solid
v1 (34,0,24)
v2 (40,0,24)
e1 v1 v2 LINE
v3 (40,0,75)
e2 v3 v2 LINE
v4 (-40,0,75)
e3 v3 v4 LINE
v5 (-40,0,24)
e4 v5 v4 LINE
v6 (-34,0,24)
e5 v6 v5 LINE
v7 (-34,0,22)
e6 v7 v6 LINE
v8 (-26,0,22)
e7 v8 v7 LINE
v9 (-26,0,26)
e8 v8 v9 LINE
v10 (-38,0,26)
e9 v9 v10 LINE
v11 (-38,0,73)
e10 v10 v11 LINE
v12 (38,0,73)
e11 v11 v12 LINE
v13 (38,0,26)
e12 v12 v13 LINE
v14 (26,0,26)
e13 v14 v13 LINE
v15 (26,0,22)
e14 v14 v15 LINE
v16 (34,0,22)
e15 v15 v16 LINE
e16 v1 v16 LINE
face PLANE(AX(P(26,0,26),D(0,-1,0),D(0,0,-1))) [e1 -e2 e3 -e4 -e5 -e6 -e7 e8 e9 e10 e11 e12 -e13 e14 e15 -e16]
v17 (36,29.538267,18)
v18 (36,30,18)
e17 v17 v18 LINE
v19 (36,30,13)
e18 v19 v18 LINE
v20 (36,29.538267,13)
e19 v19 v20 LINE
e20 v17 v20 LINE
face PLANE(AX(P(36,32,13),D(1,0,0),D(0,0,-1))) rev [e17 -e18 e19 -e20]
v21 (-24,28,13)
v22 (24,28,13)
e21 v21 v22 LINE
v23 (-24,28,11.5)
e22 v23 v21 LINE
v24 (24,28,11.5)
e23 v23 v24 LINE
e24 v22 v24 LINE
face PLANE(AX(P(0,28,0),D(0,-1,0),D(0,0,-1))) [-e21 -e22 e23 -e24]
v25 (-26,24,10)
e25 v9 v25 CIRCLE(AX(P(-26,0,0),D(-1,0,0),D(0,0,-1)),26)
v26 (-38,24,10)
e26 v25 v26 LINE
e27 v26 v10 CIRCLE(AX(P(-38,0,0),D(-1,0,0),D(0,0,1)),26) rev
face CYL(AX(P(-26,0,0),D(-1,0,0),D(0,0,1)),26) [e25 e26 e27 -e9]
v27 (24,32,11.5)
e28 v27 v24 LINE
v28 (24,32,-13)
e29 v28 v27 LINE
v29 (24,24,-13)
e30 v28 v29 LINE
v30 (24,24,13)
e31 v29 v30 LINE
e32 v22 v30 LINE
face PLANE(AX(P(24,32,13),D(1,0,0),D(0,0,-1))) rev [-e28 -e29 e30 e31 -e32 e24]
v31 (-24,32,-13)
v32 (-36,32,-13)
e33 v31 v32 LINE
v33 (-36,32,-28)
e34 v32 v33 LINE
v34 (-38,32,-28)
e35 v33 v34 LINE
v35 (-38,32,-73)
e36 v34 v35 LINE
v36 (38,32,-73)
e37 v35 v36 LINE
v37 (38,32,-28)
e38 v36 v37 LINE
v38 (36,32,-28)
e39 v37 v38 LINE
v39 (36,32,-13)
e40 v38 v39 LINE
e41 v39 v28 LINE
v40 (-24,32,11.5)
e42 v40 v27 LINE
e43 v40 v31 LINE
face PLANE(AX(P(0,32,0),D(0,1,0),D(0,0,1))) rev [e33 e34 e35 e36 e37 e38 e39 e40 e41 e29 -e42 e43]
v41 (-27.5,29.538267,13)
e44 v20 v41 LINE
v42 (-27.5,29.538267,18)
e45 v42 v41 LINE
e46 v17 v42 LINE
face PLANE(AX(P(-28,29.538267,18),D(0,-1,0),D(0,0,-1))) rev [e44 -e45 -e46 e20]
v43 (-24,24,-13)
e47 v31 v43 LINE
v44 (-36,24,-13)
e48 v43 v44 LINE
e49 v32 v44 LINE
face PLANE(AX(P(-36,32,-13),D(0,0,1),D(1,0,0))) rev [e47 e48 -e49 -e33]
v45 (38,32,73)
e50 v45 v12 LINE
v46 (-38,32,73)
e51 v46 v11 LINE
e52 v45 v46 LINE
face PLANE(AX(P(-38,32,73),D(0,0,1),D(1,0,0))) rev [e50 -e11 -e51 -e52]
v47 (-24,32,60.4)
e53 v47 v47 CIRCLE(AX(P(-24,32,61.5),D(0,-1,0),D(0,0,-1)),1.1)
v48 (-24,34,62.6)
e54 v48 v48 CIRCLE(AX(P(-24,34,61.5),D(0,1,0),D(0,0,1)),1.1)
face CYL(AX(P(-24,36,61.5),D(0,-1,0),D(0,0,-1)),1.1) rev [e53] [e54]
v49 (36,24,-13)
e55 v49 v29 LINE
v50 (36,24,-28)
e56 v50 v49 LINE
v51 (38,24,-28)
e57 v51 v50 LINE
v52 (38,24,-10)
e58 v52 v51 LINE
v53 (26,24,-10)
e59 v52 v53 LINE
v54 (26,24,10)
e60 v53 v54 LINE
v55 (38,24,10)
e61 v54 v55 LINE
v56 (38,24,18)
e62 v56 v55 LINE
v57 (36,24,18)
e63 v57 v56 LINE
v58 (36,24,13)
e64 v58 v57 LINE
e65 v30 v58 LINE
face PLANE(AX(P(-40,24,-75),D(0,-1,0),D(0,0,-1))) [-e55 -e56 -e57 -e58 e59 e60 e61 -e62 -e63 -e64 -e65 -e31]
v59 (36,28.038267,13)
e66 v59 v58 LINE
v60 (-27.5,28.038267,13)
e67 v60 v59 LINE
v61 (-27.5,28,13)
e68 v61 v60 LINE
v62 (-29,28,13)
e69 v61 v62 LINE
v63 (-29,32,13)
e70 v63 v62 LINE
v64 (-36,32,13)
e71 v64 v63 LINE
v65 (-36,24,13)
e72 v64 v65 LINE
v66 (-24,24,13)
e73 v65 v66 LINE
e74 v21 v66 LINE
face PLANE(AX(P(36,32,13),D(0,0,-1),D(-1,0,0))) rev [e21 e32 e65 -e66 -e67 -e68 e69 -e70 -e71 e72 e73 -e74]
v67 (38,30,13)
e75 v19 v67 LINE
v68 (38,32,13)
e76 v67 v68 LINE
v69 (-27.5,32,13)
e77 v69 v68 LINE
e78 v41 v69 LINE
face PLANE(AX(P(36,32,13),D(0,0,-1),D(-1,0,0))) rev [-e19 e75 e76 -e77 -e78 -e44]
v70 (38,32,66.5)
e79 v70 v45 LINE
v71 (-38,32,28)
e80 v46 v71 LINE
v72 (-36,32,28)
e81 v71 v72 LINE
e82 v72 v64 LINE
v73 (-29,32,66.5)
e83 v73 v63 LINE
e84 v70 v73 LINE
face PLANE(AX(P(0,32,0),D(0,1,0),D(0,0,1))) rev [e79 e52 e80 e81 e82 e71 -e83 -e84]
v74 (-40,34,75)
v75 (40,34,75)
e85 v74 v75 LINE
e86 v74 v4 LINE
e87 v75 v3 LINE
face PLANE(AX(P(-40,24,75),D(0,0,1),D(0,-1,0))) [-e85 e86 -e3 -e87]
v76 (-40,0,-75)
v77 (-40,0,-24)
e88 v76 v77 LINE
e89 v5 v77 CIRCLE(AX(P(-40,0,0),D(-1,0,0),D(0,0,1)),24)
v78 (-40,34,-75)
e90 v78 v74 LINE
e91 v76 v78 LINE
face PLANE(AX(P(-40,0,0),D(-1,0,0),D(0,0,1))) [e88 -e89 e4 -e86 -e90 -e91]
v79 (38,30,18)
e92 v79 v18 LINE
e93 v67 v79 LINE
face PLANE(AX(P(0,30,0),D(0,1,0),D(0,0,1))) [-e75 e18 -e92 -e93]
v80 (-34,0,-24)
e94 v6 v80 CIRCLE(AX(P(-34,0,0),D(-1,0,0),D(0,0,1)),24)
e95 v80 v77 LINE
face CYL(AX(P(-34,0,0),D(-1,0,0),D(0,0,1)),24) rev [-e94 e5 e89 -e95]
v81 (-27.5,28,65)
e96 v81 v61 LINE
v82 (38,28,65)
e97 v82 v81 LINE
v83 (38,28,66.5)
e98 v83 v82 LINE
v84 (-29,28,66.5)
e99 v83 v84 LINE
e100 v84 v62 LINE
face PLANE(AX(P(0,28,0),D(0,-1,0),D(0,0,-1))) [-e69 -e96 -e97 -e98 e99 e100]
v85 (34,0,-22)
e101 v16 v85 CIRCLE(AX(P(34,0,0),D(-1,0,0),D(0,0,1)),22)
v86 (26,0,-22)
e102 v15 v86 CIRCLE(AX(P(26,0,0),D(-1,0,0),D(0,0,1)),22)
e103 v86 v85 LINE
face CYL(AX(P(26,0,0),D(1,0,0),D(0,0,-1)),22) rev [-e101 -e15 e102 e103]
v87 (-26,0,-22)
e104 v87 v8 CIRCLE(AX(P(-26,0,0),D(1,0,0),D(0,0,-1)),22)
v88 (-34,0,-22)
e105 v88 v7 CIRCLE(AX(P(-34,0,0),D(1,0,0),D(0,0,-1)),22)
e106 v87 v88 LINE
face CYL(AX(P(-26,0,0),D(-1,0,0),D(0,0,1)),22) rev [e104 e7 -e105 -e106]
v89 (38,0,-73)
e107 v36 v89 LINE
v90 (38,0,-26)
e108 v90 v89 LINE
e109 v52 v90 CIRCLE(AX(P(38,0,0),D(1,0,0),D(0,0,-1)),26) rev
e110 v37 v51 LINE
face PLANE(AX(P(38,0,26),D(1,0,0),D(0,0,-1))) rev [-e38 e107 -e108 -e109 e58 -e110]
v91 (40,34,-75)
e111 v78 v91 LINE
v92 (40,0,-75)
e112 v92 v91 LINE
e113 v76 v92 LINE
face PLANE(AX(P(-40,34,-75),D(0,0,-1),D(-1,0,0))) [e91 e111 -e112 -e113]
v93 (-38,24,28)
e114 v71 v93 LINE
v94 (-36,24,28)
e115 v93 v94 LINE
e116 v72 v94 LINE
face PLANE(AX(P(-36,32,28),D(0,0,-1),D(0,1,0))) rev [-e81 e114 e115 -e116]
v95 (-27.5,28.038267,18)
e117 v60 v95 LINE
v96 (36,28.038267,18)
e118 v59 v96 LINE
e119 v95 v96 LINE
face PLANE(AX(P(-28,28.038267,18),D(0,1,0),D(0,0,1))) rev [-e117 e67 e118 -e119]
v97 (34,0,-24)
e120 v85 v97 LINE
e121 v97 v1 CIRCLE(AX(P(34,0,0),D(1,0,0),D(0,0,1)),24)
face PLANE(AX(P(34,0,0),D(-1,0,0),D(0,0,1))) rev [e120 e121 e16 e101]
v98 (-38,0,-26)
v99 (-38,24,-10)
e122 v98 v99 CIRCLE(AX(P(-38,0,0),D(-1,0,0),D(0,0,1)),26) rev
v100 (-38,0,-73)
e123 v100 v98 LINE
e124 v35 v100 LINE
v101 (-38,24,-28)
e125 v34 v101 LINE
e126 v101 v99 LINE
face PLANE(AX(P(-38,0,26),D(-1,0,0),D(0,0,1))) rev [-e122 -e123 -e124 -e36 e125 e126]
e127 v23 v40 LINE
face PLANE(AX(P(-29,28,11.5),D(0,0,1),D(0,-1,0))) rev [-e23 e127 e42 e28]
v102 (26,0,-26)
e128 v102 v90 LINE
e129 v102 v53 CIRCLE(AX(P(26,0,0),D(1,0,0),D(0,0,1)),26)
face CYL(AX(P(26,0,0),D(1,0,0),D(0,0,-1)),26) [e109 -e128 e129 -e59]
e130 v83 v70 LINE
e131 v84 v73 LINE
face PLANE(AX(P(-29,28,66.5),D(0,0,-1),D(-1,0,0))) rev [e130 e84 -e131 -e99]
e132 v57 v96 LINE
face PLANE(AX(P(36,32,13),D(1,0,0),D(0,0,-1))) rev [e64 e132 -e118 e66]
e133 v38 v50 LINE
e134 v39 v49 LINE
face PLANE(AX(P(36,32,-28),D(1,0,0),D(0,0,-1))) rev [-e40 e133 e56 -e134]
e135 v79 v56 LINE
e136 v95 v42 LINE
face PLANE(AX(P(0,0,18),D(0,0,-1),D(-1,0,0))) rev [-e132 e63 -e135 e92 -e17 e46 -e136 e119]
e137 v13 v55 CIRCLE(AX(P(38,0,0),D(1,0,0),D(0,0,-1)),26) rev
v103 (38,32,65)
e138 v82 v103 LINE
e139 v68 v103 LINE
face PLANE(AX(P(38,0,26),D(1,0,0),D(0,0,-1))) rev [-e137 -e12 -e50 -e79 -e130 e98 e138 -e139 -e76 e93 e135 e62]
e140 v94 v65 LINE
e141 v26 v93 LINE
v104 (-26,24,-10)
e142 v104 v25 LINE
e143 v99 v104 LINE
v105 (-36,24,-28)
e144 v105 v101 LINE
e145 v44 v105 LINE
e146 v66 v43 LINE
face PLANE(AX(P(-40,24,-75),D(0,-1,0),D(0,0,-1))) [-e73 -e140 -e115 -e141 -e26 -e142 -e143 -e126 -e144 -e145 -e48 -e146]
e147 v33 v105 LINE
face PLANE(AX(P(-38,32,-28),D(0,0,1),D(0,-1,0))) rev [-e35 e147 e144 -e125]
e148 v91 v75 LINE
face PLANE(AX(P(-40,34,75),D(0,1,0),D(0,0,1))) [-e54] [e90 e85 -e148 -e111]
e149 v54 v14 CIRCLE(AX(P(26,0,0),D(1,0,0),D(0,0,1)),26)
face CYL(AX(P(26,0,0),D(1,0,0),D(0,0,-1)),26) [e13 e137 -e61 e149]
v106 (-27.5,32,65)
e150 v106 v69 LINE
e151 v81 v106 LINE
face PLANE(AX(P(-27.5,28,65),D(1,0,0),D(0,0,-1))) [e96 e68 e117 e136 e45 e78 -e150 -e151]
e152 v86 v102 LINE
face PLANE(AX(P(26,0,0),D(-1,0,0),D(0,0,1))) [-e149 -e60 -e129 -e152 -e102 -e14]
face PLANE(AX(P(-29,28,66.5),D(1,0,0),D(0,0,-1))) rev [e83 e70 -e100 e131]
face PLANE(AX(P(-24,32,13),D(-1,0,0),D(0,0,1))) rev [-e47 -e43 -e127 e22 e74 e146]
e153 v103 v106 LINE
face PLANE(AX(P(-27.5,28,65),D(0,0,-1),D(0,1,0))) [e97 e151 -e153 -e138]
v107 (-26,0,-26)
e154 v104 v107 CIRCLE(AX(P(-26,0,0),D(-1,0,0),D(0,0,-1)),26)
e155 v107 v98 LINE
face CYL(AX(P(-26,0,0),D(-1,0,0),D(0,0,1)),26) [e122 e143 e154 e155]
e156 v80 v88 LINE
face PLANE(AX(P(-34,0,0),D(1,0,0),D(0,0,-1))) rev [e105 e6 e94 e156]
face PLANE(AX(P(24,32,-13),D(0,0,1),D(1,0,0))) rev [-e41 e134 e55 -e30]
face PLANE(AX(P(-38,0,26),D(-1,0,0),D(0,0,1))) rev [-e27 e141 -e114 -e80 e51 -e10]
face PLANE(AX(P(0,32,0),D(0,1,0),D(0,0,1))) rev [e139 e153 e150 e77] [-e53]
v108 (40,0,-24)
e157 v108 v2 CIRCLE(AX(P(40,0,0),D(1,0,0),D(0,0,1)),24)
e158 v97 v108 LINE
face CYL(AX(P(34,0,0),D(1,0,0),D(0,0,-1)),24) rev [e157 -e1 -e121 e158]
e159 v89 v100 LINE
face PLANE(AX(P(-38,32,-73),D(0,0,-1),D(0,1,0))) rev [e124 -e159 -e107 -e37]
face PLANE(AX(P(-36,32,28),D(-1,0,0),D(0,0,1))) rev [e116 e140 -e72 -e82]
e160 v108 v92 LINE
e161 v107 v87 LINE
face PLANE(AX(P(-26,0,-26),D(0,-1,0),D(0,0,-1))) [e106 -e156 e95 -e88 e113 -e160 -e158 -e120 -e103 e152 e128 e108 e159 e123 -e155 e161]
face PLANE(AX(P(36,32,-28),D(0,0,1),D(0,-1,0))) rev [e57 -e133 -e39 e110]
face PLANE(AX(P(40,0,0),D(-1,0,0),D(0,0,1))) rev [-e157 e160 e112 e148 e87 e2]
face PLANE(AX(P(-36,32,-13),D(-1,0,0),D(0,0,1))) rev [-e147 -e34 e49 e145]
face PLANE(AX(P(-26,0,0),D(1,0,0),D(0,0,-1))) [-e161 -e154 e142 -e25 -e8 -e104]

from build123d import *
from build123d.topology import SkipClean

# Parameters (mm, degrees)
EXTRUDE_2_DEPTH      = 40
EXTRUDE_2_DEPTH_BACK = 40
SKETCH_1_W           = 150
SKETCH_1_H           = 10
EXTRUDE_3_DEPTH      = 14
EXTRUDE_4_DEPTH      = 14
SKETCH_4_W           = 2
SKETCH_4_H           = 52
EXTRUDE_5_DEPTH      = 24
SKETCH_5_R           = 22
CUT_EXTRUDE_1_DEPTH  = 81
CUT_EXTRUDE_6_DEPTH  = 8
SKETCH_7_W           = 69
SKETCH_7_H           = 55
SKETCH_7_W_2         = 65.5
SKETCH_7_H_2         = 52
EXTRUDE_6_DEPTH      = 4
SKETCH_12_W          = 66
SKETCH_12_H          = 1.5
EXTRUDE_8_DEPTH      = 5
CUT_EXTRUDE_7_DEPTH  = 6
CUT_EXTRUDE_START    = -6
CUT_EXTRUDE_8_DEPTH  = 6
SKETCH_15_R          = 1.1
CUT_EXTRUDE_9_DEPTH  = 4
SKETCH_16_W          = 15.246183725
SKETCH_16_H          = 18.547486822
CUT_EXTRUDE_10_DEPTH = 2
SKETCH_17_W          = 13.790442518
SKETCH_17_H          = 12.65745234
CUT_EXTRUDE_11_DEPTH = 8
EXTRUDE_9_DEPTH      = 24


with BuildPart() as part:
    # Эскиз1 → Бобышка-Вытянуть2 (new, two sides: drawn at the far end of the back side and taken through both)
    with BuildSketch(Plane(origin=(0, 0, 0), x_dir=(0, 0, -1), z_dir=(1, 0, 0)).offset(-EXTRUDE_2_DEPTH_BACK)):
        with Locations((0, 29)):
            Rectangle(SKETCH_1_W, SKETCH_1_H)
    extrude(amount=EXTRUDE_2_DEPTH + EXTRUDE_2_DEPTH_BACK)

    # Эскиз3 → Бобышка-Вытянуть4 (add)
    with BuildSketch(Plane.ZY.offset(40)):
        with BuildLine():
            Line((-26, 0), (-22, 0))
            ThreePointArc((-22, 0), (0, 22), (22, 0))
            Line((22, 0), (26, 0))
            ThreePointArc((26, 0), (0, 26), (-26, 0))
        make_face()
    extrude(amount=-EXTRUDE_4_DEPTH)



with BuildPart() as body_2:
    # Эскиз2 → Бобышка-Вытянуть3 (new body)
    with BuildSketch(Plane(origin=(40, 0, 0), x_dir=(0, 0, -1), z_dir=(1, 0, 0))):
        with BuildLine():
            Line((-26, 0), (-22, 0))
            ThreePointArc((-22, 0), (0, 22), (22, 0))
            Line((22, 0), (26, 0))
            ThreePointArc((26, 0), (0, 26), (-26, 0))
        make_face()
    extrude(amount=-EXTRUDE_3_DEPTH)


with BuildPart() as part_1:
    add(part.part)

    add(body_2.part)  # Бобышка-Вытянуть5 merges body 2
    # Эскиз4 → Бобышка-Вытянуть5 (add)
    with BuildSketch(Plane(origin=(0, 24, 0), x_dir=(-1, 0, 0), z_dir=(0, -1, 0))):
        with Locations((39, 0)):
            Rectangle(SKETCH_4_W, SKETCH_4_H)
        with Locations((-39, 0)):
            Rectangle(SKETCH_4_W, SKETCH_4_H)
    extrude(amount=EXTRUDE_5_DEPTH)

    # Эскиз5 → Вырез-Вытянуть1 (cut)
    with SkipClean():  # the faces are left unmerged after this step: merging them gives an invalid solid
        with BuildSketch(Plane(origin=(40, 0, 0), x_dir=(0, 0, -1), z_dir=(1, 0, 0))):
            Circle(SKETCH_5_R)
        extrude(amount=-CUT_EXTRUDE_1_DEPTH, mode=Mode.SUBTRACT)
    add(part_1.part.scale(1), mode=Mode.REPLACE)  # the faces are merged on a copy

    # Эскиз6 → Вырез-Вытянуть6 (cut)
    with BuildSketch(Plane(origin=(0, 24, 0), x_dir=(-1, 0, 0), z_dir=(0, -1, 0))):
        Polygon((38, 28), (36, 28), (36, 13), (24, 13), (24, -13), (36, -13), (36, -28), (38, -28), (38, -73), (-38, -73), (-38, -27.999124699), (-36, -27.999124699), (-36, -13), (-24, -13), (-24, 13), (-36, 13), (-36, 28), (-38, 28), (-38, 73), (38, 73), align=None)
    extrude(amount=-CUT_EXTRUDE_6_DEPTH, mode=Mode.SUBTRACT)

    # Эскиз7 → Бобышка-Вытянуть6 (add)
    with BuildSketch(Plane.XZ.offset(-32)):
        with Locations((5.5, 39)):
            Rectangle(SKETCH_7_W, SKETCH_7_H)
        with Locations((5.25, 39)):
            Rectangle(SKETCH_7_W_2, SKETCH_7_H_2, mode=Mode.SUBTRACT)
    extrude(amount=EXTRUDE_6_DEPTH)

    # Эскиз12 → Бобышка-Вытянуть8 (add)
    with BuildSketch(Plane.XY.offset(13)):
        with Locations((5, 28.788266855)):
            Rectangle(SKETCH_12_W, SKETCH_12_H)
    extrude(amount=EXTRUDE_8_DEPTH)

    # Эскиз13 → Вырез-Вытянуть7 (cut)
    with BuildSketch(Plane(origin=(40, 0, 0), x_dir=(0, 0, -1), z_dir=(1, 0, 0))):
        with BuildLine():
            Line((-24, 0), (-22, 0))
            ThreePointArc((-22, 0), (0, 22), (22, 0))
            Line((22, 0), (24, 0))
            ThreePointArc((24, 0), (0, 24), (-24, 0))
        make_face()
    extrude(amount=-CUT_EXTRUDE_7_DEPTH, mode=Mode.SUBTRACT)

    # Эскиз14 → Вырез-Вытянуть8 (cut)
    with BuildSketch(Plane.ZY.offset(40).offset(CUT_EXTRUDE_START)):
        with BuildLine():
            Line((-24, 0), (-22, 0))
            ThreePointArc((-22, 0), (0, 22), (22, 0))
            Line((22, 0), (24, 0))
            ThreePointArc((24, 0), (0, 24), (-24, 0))
        make_face()
    extrude(amount=CUT_EXTRUDE_8_DEPTH, mode=Mode.SUBTRACT)

    # Эскиз15 → Вырез-Вытянуть9 (cut)
    with BuildSketch(Plane.XZ.offset(-32)):
        with Locations((-24, 61.5)):
            Circle(SKETCH_15_R)
    extrude(amount=-CUT_EXTRUDE_9_DEPTH, mode=Mode.SUBTRACT)

    # Эскиз16 → Вырез-Вытянуть10 (cut)
    with BuildSketch(Plane.XZ.offset(-32)):
        with Locations((30.376908138, 22.273743411)):
            Rectangle(SKETCH_16_W, SKETCH_16_H)
    extrude(amount=CUT_EXTRUDE_10_DEPTH, mode=Mode.SUBTRACT)

    # Эскиз17 → Вырез-Вытянуть11 (cut)
    with BuildSketch(Plane.XZ.offset(-24)):
        with Locations((31.104778741, 24.32872617)):
            Rectangle(SKETCH_17_W, SKETCH_17_H)
    extrude(amount=-CUT_EXTRUDE_11_DEPTH, mode=Mode.SUBTRACT)

    # Эскиз18 → Бобышка-Вытянуть9 (add)
    with BuildSketch(Plane.XZ.offset(-24)):
        Polygon((-40, -24), (-38, -24), (-38, -26), (-38, -73), (38, -73), (38, -26), (38, -24), (40, -24), (40, -75), (-40, -75), align=None)
        Polygon((-40, 75), (40, 75), (40, 26), (40, 24), (38, 24), (38, 26), (38, 73), (-38, 73), (-38, 26), (-38, 24), (-40, 24), (-40, 26), align=None)
    extrude(amount=EXTRUDE_9_DEPTH)


solid = part_1.part
